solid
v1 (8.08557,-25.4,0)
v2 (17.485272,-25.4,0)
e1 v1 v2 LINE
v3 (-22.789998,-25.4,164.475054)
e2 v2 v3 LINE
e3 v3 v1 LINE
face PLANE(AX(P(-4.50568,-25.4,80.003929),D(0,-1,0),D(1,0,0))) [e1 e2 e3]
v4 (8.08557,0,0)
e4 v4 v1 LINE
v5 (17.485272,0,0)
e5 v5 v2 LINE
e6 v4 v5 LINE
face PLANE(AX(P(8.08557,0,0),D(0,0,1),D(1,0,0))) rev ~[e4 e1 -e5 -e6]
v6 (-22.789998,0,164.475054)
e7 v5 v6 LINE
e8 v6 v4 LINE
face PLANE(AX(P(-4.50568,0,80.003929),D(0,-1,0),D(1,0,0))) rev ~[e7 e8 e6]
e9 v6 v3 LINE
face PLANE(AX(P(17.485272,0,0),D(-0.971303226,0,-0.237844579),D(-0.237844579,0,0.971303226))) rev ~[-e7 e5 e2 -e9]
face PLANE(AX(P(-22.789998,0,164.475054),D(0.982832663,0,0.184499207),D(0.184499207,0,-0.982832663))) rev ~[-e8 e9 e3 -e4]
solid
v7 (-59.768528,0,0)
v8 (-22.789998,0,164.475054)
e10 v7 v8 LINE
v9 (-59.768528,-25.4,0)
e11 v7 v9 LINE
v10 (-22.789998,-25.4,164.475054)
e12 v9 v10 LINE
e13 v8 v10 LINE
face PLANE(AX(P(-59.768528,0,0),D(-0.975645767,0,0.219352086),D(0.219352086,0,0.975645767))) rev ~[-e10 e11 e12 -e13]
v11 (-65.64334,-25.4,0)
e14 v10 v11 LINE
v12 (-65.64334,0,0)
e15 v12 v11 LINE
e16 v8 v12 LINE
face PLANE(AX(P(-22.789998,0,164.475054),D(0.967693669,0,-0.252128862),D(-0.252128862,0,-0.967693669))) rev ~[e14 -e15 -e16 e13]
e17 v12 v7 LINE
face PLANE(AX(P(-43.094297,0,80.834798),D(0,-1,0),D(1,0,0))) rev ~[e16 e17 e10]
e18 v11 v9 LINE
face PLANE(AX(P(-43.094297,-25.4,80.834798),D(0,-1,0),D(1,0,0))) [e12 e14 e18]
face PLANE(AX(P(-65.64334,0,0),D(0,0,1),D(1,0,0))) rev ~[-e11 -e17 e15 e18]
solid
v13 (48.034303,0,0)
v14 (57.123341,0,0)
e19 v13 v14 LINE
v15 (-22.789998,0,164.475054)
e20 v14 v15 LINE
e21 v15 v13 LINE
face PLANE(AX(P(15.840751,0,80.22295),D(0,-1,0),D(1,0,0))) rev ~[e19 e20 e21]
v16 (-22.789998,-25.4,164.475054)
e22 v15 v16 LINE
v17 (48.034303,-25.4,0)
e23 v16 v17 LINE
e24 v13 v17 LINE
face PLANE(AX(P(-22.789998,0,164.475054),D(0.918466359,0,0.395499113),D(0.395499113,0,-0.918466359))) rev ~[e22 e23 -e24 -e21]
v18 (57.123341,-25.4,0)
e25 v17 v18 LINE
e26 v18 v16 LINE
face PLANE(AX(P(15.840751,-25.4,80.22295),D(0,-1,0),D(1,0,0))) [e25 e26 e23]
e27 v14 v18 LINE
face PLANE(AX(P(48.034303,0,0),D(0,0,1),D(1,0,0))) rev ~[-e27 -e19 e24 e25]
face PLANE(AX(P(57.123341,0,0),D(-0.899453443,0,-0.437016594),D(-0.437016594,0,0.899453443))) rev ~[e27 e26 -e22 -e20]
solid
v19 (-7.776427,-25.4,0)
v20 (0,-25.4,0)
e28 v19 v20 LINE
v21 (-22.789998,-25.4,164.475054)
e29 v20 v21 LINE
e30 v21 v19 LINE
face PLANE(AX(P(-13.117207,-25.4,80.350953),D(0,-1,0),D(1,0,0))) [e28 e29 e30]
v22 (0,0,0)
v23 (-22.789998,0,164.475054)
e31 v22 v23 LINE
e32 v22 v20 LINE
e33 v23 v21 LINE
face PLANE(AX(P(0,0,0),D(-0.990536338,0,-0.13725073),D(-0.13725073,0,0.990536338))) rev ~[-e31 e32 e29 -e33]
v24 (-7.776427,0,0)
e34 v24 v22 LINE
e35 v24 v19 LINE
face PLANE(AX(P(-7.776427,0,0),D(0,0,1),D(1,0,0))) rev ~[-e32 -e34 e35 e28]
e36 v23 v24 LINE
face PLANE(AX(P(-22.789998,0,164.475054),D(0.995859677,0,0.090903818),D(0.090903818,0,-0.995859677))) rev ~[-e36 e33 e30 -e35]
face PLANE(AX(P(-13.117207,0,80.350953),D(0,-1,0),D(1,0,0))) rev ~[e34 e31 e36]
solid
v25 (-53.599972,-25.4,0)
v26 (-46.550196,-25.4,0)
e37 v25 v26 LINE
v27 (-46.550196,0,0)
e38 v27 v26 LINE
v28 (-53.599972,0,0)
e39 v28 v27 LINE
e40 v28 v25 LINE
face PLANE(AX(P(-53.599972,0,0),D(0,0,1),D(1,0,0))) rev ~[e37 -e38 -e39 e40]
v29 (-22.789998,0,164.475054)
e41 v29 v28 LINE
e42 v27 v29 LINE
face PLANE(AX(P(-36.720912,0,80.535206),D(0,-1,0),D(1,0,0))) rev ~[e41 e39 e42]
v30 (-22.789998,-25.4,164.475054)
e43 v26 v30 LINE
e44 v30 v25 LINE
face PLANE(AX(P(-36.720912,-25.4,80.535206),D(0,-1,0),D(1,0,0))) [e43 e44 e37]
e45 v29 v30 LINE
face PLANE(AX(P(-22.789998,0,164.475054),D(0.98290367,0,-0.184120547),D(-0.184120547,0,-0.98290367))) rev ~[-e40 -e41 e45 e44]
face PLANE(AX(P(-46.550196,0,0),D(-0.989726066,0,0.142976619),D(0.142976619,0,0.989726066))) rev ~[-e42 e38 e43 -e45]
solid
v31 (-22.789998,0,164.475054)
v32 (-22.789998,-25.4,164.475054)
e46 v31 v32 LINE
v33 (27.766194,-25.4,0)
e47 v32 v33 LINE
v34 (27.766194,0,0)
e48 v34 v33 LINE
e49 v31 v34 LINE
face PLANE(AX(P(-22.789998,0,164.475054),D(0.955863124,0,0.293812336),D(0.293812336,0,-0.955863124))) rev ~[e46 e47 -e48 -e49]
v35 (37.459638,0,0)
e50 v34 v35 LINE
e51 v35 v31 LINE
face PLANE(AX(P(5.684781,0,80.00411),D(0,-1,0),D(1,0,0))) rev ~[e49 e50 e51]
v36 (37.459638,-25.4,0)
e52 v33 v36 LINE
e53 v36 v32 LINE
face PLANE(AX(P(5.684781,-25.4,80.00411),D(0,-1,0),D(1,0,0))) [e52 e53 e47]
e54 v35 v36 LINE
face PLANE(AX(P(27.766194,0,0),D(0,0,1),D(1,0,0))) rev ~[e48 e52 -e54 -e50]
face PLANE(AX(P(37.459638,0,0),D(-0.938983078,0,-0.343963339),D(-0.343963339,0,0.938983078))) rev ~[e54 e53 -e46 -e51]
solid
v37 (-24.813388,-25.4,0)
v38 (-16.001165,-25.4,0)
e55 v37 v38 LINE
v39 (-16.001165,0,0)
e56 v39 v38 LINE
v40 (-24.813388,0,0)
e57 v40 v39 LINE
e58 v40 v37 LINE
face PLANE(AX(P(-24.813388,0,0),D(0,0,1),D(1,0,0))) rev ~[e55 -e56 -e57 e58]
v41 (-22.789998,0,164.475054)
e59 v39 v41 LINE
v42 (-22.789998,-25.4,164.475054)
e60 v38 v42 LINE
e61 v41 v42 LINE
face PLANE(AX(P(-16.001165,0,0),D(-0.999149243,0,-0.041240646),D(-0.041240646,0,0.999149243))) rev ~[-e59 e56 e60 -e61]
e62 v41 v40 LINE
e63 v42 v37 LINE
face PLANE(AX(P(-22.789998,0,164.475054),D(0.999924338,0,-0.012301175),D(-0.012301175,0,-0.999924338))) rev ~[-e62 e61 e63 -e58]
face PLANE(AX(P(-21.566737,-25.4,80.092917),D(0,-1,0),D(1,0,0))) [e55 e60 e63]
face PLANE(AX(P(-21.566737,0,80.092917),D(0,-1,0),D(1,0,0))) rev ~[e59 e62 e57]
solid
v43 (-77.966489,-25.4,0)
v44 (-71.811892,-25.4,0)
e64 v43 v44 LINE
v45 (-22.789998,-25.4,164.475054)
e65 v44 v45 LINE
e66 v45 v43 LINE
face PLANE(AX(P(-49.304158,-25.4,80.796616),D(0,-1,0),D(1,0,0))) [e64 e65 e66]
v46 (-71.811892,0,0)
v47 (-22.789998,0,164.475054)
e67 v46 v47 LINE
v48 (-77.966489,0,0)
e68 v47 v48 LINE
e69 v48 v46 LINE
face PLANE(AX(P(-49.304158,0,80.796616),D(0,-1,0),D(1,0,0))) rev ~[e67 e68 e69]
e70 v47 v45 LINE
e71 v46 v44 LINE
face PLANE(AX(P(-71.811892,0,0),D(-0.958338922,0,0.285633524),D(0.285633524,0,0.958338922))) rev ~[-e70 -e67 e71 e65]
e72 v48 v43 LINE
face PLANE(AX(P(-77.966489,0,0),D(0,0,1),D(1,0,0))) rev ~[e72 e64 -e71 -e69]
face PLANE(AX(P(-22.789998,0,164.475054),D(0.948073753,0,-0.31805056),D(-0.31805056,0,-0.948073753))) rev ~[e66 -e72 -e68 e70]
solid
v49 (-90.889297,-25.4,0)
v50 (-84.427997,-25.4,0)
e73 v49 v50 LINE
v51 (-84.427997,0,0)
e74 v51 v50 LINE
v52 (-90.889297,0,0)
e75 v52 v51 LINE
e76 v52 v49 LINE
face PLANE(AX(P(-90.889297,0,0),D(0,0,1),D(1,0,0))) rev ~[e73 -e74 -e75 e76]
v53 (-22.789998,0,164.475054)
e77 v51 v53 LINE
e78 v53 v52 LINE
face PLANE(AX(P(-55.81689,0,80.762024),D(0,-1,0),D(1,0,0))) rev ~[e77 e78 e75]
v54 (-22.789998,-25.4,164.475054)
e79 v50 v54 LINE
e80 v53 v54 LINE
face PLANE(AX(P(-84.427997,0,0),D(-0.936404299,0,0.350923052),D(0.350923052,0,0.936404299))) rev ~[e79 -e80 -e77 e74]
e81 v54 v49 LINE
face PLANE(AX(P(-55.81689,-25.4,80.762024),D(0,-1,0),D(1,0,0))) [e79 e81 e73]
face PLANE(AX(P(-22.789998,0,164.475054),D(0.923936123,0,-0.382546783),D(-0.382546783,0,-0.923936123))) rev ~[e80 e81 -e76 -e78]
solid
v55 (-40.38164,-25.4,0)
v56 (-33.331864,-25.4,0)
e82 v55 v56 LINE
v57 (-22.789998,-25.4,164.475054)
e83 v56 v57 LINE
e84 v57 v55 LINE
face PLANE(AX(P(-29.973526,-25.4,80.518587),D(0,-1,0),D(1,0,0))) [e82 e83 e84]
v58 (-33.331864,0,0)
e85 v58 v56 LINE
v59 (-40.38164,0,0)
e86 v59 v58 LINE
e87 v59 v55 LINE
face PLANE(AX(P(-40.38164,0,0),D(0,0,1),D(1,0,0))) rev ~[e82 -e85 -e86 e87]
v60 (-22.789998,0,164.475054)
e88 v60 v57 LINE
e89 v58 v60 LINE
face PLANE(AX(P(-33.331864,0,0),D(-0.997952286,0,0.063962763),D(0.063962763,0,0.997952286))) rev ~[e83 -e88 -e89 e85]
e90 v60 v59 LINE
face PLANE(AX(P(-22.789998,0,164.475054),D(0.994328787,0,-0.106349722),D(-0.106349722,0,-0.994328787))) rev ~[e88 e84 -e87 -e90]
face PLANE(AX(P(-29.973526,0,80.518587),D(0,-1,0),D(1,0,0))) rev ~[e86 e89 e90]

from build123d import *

# Parameters (mm, degrees)
F1_DEPTH = 25.4


# Not quite as in the source:
# - a feature names something its author has since deleted; it is built from what else it names


with BuildPart() as f1:
    # F0 (on Front) → F1 (new body)
    with BuildSketch(Plane.XZ):
        Polygon((-22.78999798, 164.4750535488), (-90.8892974257, 0), (-84.4279974699, 0), align=None)
    extrude(amount=F1_DEPTH)


with BuildPart() as f1b:
    # F0 (on Front) → F1, piece 2 (new body)
    with BuildSketch(Plane.XZ):
        Polygon((-71.8118920922, 0), (-22.78999798, 164.4750535488), (-77.9664888978, 0), align=None)
    extrude(amount=F1_DEPTH)


with BuildPart() as f1c:
    # F0 (on Front) → F1, piece 3 (new body)
    with BuildSketch(Plane.XZ):
        Polygon((-59.7685277462, 0), (-22.78999798, 164.4750535488), (-65.6433403492, 0), align=None)
    extrude(amount=F1_DEPTH)


with BuildPart() as f1d:
    # F0 (on Front) → F1, piece 4 (new body)
    with BuildSketch(Plane.XZ):
        Polygon((-46.5501956642, 0), (-22.78999798, 164.4750535488), (-53.5999722779, 0), align=None)
    extrude(amount=F1_DEPTH)


with BuildPart() as f1e:
    # F0 (on Front) → F1, piece 5 (new body)
    with BuildSketch(Plane.XZ):
        Polygon((-33.3318635821, 0), (-22.78999798, 164.4750535488), (-40.3816401958, 0), align=None)
    extrude(amount=F1_DEPTH)


with BuildPart() as f1f:
    # F0 (on Front) → F1, piece 6 (new body)
    with BuildSketch(Plane.XZ):
        Polygon((-16.0011649132, 0), (-22.78999798, 164.4750535488), (-24.813387543, 0), align=None)
    extrude(amount=F1_DEPTH)


with BuildPart() as f1g:
    # F0 (on Front) → F1, piece 7 (new body)
    with BuildSketch(Plane.XZ):
        Polygon((0, 0), (-22.78999798, 164.4750535488), (-7.7764266171, 0), align=None)
    extrude(amount=F1_DEPTH)


with BuildPart() as f1h:
    # F0 (on Front) → F1, piece 8 (new body)
    with BuildSketch(Plane.XZ):
        Polygon((17.4852721393, 0), (-22.78999798, 164.4750535488), (8.0855702981, 0), align=None)
    extrude(amount=F1_DEPTH)


with BuildPart() as f1i:
    # F0 (on Front) → F1, piece 9 (new body)
    with BuildSketch(Plane.XZ):
        Polygon((37.4596379697, 0), (-22.78999798, 164.4750535488), (27.7661941946, 0), align=None)
    extrude(amount=F1_DEPTH)


with BuildPart() as f1j:
    # F0 (on Front) → F1, piece 10 (new body)
    with BuildSketch(Plane.XZ):
        Polygon((57.1233406663, 0), (-22.78999798, 164.4750535488), (48.0343028903, 0), align=None)
    extrude(amount=F1_DEPTH)


solid = Compound([f1.part, f1b.part, f1c.part, f1d.part, f1e.part, f1f.part, f1g.part, f1h.part, f1i.part, f1j.part])
